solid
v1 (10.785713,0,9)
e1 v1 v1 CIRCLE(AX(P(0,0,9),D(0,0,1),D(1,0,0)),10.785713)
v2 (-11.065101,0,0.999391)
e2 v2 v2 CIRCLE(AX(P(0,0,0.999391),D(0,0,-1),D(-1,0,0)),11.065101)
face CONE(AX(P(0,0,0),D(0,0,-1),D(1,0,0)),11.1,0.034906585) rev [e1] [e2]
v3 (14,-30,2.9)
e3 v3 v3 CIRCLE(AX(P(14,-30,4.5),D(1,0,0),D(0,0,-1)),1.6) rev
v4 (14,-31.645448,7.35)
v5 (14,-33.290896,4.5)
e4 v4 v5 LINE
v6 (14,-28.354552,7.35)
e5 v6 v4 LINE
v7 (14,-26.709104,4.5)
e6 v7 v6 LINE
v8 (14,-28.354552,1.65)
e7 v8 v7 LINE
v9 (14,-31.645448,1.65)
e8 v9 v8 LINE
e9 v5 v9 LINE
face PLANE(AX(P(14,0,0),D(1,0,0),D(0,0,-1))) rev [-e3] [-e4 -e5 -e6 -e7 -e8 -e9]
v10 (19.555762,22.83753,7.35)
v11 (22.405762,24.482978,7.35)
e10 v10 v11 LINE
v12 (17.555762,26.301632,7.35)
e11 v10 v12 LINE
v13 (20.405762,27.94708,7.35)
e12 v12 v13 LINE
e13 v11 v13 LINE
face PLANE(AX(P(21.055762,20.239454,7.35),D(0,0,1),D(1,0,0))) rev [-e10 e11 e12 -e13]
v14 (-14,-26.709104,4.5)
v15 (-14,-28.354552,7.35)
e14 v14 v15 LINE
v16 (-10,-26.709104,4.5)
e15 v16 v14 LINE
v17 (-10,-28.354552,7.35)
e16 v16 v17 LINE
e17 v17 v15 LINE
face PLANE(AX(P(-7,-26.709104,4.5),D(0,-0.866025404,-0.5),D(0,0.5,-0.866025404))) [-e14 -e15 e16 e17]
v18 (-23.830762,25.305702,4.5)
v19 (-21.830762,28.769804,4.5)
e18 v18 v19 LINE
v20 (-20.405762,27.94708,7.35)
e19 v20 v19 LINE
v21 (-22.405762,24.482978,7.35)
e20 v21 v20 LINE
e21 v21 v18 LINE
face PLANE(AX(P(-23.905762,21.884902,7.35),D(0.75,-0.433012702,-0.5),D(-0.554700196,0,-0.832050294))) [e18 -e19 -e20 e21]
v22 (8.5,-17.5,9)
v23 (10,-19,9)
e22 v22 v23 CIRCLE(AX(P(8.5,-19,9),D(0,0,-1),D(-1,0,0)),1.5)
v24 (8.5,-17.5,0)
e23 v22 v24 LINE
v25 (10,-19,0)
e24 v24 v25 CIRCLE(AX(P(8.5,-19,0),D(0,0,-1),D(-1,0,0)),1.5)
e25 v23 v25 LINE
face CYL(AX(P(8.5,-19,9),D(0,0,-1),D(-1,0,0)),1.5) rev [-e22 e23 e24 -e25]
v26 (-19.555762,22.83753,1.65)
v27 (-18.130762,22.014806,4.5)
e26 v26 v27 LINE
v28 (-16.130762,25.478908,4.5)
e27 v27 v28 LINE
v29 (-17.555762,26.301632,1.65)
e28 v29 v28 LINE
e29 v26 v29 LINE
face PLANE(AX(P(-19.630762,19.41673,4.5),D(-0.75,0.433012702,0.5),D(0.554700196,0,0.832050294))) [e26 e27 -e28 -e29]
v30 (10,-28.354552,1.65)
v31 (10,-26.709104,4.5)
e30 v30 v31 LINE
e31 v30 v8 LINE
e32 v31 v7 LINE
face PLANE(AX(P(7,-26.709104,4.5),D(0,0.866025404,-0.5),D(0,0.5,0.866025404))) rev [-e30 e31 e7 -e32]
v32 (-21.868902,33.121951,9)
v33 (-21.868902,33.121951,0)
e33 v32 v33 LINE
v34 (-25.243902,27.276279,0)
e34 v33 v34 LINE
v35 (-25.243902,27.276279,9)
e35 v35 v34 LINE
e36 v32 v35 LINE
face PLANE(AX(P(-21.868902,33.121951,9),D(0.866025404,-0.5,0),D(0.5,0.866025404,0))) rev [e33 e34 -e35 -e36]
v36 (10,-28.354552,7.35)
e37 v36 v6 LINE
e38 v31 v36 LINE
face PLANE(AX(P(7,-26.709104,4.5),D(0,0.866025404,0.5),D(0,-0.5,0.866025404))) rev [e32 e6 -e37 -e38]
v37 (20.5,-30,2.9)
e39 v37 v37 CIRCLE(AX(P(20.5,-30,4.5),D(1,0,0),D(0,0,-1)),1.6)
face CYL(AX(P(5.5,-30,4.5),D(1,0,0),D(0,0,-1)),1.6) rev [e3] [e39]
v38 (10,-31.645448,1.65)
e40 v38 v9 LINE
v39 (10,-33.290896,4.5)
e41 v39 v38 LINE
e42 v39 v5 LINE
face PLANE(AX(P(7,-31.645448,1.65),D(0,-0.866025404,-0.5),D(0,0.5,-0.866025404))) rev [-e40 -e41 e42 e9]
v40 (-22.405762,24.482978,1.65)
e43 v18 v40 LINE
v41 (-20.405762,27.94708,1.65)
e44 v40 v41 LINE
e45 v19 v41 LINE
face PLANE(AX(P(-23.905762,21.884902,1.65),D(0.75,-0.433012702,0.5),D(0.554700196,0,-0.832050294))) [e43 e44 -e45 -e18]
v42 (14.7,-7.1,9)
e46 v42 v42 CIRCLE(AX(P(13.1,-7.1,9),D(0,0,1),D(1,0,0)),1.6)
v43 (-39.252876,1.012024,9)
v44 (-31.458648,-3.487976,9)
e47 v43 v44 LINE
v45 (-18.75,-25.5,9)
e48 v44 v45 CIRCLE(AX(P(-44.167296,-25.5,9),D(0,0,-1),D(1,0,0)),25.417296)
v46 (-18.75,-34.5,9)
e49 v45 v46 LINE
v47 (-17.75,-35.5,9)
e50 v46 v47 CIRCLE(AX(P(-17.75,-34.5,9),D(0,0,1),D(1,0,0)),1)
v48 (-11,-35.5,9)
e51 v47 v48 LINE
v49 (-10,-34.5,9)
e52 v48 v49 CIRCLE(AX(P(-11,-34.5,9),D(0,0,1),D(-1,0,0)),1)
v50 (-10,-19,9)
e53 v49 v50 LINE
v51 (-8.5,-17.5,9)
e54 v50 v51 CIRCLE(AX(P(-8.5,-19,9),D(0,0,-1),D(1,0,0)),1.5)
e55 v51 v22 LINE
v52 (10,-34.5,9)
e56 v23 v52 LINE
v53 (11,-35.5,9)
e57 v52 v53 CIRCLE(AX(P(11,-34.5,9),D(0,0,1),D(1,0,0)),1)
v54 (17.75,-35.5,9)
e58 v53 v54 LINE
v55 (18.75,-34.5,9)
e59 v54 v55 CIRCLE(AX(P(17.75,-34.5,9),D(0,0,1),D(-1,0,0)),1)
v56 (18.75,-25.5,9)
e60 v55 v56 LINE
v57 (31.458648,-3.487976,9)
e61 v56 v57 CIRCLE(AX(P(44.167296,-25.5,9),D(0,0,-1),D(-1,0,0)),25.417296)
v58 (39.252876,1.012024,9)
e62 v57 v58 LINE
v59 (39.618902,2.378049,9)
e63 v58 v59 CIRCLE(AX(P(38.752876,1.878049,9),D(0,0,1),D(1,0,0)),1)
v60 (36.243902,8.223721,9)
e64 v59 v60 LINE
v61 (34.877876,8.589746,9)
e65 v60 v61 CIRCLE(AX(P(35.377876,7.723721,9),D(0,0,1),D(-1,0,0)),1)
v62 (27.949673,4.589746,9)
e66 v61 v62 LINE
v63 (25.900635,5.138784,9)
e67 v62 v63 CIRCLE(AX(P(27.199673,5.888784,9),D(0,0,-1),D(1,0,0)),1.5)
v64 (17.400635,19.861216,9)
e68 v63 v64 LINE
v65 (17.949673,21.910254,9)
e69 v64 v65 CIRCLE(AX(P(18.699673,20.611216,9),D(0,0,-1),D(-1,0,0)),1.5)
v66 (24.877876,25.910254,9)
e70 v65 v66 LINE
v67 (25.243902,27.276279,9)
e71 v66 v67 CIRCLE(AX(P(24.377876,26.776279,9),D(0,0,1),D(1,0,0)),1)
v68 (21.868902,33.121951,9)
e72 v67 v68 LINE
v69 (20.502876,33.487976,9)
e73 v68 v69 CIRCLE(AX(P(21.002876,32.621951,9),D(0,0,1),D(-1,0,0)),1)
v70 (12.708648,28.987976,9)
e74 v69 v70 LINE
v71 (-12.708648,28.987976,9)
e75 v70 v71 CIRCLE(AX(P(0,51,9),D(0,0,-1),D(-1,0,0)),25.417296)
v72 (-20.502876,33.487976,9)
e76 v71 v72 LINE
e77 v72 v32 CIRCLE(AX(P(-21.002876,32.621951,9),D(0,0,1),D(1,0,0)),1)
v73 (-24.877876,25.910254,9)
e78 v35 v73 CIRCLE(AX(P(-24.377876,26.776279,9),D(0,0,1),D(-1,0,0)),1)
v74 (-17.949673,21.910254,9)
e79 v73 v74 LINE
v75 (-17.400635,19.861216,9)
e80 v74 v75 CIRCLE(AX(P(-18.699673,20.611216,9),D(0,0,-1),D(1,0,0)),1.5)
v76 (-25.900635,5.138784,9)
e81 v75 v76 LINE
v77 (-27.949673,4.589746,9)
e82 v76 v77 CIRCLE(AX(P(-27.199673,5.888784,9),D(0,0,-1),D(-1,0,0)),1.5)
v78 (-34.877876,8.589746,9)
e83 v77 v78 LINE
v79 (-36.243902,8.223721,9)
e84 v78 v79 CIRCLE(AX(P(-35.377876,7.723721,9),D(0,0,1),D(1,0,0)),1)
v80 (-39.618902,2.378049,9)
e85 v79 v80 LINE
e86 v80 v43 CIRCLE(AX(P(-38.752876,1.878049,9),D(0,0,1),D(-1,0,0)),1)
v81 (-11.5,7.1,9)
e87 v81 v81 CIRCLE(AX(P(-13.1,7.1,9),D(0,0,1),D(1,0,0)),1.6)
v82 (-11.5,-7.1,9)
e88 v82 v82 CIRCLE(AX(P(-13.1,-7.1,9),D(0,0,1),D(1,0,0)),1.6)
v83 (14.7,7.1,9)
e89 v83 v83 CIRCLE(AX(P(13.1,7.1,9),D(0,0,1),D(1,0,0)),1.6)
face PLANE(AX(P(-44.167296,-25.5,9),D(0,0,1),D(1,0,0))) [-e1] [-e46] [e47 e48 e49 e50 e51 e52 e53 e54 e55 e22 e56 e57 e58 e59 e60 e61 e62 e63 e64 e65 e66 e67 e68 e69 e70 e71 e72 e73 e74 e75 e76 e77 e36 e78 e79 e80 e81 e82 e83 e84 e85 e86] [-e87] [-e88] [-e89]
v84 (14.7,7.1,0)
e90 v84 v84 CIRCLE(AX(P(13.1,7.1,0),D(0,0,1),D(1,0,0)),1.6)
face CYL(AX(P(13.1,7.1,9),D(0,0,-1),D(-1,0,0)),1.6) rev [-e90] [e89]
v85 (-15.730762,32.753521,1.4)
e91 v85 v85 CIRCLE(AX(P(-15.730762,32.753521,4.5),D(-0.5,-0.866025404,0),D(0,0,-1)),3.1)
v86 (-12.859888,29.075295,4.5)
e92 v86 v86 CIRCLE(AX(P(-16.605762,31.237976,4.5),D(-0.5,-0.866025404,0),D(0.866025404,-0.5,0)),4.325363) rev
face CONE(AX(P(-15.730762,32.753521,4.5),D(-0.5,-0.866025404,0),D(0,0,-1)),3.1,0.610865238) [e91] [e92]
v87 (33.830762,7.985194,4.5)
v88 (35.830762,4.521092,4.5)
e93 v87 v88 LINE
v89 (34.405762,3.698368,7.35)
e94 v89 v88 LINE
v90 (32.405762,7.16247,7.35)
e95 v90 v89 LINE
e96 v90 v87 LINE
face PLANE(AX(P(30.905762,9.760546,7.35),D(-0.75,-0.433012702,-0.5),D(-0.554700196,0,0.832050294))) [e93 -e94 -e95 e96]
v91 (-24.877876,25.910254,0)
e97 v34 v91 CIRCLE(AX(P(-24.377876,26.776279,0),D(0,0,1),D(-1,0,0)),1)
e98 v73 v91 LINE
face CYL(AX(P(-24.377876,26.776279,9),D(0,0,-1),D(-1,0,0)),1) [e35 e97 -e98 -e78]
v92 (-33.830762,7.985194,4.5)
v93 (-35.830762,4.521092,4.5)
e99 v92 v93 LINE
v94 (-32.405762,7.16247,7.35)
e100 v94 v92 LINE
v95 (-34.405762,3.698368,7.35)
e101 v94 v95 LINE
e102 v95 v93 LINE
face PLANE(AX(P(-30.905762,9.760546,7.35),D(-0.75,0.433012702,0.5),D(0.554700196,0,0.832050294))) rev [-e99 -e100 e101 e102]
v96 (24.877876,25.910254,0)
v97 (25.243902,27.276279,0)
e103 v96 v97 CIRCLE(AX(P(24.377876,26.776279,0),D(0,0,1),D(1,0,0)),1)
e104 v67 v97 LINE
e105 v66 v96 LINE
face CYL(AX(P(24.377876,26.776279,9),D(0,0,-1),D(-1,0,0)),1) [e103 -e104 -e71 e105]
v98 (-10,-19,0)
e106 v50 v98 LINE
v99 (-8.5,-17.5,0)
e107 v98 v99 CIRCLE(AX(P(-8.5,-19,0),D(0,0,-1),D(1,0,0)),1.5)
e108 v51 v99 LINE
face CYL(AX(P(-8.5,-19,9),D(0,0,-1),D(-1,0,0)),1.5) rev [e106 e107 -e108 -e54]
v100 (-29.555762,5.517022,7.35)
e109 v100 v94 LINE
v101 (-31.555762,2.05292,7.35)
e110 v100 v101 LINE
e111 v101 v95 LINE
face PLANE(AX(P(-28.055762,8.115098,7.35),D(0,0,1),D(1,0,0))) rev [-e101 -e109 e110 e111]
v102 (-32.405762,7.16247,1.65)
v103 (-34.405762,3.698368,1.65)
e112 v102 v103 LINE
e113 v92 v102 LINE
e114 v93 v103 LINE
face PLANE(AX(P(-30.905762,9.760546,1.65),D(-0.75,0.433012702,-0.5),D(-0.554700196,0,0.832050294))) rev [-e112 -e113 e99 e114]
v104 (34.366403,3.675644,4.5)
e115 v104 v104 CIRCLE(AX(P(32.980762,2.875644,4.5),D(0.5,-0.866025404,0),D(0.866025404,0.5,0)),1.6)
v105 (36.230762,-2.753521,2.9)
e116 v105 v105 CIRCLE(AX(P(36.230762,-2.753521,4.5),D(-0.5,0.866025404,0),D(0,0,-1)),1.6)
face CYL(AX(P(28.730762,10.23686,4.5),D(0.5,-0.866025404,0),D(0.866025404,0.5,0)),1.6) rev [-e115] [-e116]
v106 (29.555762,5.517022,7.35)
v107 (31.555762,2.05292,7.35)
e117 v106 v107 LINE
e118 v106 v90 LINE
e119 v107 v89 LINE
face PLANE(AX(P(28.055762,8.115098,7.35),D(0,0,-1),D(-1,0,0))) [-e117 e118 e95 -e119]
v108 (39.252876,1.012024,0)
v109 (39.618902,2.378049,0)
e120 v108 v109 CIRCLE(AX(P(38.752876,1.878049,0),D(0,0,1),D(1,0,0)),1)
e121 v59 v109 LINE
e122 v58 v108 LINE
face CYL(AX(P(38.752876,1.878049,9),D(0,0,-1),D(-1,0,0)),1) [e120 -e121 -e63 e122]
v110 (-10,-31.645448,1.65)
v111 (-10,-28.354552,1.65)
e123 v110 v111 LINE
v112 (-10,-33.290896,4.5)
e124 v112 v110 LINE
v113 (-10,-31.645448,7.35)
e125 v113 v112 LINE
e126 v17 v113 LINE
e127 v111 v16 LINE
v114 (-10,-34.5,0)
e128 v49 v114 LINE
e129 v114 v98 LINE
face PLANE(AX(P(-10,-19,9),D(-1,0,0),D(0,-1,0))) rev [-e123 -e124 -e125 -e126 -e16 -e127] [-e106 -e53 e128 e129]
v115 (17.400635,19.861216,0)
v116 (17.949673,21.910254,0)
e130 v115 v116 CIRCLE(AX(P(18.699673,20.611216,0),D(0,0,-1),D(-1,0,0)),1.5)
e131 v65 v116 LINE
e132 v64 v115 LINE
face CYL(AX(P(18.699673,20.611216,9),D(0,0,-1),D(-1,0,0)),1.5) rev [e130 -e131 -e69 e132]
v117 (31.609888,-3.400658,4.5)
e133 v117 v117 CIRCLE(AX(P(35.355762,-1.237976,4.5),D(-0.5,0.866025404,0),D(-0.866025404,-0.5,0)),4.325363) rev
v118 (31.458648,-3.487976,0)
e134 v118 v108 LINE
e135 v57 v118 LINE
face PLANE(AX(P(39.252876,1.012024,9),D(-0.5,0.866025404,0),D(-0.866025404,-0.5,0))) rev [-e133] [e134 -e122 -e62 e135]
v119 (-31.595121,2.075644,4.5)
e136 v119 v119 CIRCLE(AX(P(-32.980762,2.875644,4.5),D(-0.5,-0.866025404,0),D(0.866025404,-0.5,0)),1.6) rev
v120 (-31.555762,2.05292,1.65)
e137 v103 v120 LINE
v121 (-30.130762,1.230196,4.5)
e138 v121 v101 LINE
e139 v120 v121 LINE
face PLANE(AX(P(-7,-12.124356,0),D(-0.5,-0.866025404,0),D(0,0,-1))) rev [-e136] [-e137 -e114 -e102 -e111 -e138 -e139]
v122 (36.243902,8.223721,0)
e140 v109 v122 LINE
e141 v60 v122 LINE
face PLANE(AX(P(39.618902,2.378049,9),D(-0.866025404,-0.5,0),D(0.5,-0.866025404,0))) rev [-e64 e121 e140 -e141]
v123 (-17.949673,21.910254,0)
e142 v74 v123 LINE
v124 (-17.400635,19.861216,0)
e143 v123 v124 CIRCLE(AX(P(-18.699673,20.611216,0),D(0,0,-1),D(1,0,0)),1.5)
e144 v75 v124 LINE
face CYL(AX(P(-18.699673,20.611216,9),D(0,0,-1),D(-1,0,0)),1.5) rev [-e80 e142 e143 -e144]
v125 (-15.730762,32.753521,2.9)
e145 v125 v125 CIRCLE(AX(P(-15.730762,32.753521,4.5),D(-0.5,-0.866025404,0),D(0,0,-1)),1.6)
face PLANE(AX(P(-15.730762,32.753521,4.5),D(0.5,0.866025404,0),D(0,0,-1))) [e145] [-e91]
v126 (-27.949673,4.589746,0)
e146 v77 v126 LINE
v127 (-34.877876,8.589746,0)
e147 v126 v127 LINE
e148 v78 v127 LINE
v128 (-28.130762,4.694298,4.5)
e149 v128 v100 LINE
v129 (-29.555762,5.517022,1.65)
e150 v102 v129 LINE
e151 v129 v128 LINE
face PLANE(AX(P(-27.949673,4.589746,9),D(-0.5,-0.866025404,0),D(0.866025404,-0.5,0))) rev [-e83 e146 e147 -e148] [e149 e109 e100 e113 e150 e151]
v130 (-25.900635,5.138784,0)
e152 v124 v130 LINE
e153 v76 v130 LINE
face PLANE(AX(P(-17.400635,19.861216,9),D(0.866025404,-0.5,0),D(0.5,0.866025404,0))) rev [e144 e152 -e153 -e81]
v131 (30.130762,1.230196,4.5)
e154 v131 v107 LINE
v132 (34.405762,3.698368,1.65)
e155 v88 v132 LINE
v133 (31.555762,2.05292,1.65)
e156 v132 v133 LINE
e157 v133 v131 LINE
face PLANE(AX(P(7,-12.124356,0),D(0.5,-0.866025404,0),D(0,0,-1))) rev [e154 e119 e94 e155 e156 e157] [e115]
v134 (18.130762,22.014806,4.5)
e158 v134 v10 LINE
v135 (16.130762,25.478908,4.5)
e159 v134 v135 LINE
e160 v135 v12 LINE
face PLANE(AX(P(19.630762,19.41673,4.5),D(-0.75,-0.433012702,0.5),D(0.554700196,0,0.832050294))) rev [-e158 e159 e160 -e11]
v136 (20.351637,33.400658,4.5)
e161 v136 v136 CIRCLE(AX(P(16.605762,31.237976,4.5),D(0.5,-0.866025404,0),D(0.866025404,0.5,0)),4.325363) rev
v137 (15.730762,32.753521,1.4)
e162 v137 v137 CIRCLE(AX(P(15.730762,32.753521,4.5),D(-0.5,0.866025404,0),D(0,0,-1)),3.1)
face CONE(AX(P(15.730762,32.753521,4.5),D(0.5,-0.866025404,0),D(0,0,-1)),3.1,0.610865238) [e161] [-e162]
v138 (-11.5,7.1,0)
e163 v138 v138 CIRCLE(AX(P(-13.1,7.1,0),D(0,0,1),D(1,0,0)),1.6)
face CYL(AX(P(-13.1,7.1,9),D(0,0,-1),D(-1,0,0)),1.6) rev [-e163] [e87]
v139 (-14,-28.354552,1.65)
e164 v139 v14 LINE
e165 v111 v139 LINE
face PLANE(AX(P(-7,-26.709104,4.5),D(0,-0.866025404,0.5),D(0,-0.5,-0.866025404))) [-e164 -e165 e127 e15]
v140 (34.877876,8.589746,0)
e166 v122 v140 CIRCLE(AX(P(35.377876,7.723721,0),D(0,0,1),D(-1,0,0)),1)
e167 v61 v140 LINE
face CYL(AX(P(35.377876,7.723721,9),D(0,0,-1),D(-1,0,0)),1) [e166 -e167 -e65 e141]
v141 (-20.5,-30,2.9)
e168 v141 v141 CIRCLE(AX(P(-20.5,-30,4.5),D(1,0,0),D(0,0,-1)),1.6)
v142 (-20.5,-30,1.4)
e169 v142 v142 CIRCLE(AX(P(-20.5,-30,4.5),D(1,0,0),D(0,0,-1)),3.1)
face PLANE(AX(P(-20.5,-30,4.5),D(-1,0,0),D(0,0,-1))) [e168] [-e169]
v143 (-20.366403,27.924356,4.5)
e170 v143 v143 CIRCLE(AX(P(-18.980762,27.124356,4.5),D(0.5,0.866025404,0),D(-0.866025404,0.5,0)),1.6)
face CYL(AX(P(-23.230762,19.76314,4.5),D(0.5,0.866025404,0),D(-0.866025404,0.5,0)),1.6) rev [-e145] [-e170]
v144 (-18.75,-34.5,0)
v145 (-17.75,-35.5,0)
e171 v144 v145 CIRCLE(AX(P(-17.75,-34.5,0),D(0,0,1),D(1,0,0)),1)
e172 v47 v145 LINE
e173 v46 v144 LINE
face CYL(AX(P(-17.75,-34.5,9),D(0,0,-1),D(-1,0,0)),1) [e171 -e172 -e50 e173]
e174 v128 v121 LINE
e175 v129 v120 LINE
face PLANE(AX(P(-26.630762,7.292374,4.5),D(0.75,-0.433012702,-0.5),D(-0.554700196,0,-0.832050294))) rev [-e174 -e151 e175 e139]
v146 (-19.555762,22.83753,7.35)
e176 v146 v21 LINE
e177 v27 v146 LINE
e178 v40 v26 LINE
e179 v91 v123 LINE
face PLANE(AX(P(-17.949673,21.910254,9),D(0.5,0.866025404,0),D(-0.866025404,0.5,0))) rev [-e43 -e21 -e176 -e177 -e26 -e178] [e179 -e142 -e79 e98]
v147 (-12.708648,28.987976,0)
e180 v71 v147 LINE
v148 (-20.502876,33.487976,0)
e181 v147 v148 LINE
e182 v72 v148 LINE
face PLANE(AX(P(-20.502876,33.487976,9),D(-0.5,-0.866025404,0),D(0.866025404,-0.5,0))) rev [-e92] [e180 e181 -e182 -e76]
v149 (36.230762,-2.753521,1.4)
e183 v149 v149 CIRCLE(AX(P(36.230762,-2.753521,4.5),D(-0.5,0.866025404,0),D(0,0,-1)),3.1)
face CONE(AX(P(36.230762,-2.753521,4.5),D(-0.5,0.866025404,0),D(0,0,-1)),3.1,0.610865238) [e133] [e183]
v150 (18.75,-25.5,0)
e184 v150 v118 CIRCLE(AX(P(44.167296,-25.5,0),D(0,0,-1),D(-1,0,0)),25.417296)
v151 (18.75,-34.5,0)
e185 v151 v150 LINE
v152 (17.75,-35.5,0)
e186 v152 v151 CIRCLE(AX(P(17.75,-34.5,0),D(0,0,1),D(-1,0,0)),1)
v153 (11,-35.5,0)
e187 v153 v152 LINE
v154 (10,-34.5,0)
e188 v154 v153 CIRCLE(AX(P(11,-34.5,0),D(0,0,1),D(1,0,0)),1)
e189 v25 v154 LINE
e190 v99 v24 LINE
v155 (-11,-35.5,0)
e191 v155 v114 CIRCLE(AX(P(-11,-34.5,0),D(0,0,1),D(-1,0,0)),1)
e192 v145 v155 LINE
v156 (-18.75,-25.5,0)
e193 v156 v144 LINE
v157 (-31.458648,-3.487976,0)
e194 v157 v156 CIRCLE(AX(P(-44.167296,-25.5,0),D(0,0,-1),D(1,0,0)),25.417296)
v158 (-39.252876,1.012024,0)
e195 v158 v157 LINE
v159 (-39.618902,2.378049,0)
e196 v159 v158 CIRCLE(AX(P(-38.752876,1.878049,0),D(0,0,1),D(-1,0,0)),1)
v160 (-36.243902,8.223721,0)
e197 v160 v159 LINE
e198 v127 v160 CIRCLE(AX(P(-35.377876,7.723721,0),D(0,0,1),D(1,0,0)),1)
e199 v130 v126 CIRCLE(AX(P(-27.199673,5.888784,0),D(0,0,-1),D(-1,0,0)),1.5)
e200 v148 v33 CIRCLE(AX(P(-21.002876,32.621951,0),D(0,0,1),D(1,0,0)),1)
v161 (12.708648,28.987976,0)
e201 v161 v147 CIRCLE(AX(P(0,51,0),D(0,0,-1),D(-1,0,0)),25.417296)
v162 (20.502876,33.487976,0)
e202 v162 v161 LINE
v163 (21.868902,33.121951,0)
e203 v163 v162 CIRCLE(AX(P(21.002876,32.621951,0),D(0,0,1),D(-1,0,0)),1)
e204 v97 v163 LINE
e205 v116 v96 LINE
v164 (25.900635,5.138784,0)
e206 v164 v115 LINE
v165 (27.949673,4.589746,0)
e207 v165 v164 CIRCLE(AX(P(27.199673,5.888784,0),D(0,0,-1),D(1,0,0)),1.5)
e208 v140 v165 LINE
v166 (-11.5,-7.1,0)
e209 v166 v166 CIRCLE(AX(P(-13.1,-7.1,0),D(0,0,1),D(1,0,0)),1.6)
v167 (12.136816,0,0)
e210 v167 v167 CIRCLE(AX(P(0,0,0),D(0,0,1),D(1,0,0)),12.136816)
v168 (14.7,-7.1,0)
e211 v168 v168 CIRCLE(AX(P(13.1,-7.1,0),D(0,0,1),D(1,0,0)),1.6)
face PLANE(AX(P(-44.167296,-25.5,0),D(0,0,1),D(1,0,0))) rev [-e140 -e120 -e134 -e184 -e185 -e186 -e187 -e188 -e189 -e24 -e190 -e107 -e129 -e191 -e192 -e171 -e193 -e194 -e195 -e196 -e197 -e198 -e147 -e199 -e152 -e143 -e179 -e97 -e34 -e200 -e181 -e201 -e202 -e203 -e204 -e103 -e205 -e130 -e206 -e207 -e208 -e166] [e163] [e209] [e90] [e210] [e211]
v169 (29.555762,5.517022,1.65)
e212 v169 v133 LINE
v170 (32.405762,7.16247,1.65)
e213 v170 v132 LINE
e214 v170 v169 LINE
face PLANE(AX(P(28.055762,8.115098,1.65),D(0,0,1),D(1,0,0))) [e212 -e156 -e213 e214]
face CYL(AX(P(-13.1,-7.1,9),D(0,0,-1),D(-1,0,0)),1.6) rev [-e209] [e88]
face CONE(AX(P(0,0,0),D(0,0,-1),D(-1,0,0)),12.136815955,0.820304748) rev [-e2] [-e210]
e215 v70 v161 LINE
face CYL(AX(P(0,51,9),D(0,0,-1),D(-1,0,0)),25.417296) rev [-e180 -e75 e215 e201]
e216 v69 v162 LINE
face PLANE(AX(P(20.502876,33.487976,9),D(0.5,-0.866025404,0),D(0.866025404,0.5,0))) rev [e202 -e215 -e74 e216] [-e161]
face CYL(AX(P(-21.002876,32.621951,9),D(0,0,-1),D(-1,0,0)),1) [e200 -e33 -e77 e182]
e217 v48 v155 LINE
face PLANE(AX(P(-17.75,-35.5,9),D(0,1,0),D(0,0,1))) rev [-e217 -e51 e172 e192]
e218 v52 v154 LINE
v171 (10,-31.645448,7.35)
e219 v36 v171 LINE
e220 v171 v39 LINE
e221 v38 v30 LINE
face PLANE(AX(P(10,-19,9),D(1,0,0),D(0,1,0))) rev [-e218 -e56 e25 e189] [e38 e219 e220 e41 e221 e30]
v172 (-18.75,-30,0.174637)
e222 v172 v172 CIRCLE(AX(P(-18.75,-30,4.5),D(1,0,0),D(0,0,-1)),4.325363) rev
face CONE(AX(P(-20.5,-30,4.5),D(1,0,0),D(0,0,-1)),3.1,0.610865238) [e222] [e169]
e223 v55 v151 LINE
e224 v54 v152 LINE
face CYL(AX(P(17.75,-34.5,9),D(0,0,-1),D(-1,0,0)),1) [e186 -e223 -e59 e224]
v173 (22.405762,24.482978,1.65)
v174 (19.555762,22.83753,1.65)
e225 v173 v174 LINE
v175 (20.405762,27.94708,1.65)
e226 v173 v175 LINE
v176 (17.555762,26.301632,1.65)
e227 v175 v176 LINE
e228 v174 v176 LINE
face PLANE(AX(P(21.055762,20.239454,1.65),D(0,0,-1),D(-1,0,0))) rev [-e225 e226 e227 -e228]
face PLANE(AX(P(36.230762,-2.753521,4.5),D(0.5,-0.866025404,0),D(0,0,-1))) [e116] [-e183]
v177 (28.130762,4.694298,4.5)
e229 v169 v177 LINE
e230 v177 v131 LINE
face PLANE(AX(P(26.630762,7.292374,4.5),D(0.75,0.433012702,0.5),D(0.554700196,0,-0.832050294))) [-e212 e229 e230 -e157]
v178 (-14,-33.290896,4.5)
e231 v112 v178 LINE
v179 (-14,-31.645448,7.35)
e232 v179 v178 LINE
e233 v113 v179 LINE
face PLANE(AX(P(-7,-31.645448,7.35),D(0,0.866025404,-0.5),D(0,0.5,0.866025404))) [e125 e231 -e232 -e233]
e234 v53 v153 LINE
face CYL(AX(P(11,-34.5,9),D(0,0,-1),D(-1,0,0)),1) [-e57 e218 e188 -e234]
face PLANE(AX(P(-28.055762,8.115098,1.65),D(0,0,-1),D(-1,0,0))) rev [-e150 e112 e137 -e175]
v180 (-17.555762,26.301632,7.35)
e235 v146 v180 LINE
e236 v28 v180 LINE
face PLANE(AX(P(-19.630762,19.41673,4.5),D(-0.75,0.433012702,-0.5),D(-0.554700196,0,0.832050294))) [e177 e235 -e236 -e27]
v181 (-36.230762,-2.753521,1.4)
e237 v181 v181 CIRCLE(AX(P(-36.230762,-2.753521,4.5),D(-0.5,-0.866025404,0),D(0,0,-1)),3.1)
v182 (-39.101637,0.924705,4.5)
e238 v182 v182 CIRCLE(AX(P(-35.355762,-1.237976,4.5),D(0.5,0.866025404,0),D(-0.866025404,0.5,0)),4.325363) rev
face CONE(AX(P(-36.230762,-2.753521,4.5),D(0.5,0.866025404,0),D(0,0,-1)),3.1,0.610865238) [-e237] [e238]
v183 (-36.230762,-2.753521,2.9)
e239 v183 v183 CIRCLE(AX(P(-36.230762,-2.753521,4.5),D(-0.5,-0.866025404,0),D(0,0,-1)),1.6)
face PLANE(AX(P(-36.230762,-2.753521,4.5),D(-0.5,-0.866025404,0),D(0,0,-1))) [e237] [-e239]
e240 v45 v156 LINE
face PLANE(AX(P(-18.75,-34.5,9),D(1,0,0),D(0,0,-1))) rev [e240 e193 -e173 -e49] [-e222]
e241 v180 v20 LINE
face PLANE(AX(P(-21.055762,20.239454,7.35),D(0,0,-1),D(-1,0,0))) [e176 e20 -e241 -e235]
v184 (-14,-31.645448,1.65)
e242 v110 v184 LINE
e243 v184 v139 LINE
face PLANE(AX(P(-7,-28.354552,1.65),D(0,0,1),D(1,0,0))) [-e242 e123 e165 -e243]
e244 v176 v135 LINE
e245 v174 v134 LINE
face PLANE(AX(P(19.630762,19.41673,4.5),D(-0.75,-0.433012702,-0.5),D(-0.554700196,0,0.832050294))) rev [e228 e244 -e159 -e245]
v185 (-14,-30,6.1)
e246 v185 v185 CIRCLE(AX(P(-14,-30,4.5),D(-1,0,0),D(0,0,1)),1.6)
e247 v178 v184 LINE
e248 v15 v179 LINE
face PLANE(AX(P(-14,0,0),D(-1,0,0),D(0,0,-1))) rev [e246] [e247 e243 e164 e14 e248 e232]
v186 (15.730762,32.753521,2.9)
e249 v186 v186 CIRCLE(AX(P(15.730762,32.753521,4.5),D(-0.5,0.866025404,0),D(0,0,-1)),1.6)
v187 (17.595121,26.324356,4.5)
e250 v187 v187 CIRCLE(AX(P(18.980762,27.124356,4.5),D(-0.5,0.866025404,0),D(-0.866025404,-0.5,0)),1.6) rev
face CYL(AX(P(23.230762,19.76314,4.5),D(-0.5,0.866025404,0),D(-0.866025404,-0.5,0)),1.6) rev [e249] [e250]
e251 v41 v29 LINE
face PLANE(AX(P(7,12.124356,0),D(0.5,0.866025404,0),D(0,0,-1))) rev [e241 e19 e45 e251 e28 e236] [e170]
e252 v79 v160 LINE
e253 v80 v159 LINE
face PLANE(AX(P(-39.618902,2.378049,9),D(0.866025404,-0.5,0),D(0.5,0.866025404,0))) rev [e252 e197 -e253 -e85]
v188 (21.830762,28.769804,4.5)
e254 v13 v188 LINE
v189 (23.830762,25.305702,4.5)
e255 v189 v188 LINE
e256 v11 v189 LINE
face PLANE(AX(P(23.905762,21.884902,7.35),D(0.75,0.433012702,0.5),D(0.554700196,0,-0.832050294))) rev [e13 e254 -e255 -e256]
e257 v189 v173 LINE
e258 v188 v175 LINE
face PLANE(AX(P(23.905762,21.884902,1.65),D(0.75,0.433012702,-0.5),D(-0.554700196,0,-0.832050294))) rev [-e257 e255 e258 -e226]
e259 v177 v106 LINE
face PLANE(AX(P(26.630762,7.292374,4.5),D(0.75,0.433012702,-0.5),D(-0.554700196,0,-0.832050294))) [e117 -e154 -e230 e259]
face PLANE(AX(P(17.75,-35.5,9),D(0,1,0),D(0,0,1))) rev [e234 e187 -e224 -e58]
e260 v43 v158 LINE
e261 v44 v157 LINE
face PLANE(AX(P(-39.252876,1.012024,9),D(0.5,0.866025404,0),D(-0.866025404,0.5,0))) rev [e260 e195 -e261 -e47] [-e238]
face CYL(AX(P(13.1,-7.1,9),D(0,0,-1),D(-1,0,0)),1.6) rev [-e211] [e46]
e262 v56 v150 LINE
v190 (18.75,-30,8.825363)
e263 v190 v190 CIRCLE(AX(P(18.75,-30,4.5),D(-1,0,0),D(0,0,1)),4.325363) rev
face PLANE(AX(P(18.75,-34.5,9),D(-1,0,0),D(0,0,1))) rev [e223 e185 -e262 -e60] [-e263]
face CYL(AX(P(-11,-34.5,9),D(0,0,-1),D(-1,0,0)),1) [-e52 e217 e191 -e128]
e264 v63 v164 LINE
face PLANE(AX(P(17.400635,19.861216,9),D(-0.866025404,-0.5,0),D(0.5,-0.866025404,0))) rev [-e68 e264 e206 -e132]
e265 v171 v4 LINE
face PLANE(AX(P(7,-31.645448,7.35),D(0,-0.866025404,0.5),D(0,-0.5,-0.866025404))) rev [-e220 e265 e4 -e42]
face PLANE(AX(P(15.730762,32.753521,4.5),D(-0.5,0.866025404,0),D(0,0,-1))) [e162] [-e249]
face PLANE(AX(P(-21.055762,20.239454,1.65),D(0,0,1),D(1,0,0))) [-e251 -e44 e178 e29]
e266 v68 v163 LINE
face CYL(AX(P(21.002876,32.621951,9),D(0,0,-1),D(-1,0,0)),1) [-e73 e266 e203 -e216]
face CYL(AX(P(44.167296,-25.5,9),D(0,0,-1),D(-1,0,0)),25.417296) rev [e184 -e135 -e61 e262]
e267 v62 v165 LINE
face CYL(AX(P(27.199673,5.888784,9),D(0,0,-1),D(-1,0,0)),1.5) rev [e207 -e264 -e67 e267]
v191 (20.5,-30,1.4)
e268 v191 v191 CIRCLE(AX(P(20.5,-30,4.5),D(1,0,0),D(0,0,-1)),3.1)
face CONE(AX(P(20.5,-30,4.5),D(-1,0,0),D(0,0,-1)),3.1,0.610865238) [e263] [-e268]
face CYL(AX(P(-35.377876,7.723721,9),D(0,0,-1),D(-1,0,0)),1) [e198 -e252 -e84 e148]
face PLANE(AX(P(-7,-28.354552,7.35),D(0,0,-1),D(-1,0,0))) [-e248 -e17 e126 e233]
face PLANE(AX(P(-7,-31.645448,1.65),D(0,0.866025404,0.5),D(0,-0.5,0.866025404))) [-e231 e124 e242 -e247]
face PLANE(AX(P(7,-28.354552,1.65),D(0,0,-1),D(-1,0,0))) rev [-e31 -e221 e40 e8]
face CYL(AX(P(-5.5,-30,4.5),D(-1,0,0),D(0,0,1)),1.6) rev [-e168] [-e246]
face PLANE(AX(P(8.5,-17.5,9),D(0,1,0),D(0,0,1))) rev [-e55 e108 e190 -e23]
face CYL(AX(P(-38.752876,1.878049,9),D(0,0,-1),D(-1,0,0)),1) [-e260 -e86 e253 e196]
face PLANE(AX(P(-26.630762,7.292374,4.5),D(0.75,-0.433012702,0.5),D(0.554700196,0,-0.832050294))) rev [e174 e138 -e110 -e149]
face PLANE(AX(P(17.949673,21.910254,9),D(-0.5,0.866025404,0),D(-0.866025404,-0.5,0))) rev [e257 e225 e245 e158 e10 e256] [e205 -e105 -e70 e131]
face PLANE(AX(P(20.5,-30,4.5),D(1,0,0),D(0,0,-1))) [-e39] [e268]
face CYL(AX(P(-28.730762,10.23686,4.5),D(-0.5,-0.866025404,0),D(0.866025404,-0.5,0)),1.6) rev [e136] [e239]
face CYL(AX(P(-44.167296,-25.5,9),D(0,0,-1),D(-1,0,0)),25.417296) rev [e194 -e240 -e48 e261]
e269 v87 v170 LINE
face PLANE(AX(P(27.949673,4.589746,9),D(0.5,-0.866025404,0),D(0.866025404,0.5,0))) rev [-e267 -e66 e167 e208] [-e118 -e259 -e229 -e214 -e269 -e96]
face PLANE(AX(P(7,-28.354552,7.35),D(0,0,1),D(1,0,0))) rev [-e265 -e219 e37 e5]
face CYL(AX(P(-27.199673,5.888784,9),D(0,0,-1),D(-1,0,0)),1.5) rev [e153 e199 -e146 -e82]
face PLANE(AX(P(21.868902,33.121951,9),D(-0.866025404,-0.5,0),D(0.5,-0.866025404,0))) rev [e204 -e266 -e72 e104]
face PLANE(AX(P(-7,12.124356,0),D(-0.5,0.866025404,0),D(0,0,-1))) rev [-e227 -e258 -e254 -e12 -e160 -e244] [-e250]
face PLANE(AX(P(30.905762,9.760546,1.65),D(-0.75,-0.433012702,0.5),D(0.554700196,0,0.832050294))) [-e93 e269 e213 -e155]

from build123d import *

# Parameters (mm, degrees)
BOSS_EXTRUDE1_DEPTH     = 9
SKETCH4_R               = 3.1
BOSS_EXTRUDE3_DEPTH     = 1.75
BOSS_EXTRUDE3_DRAFT     = 35
SKETCH7_R               = 1.600000259
CUT_EXTRUDE4_DEPTH      = 15
CUT_EXTRUDE5_DEPTH      = 7
MIRROR1_START           = -14
MIRROR1_DEPTH           = 4
MIRROR1_START_2         = -18.75
MIRROR1_2_OUTLINE_R     = 1.600000259
MIRROR1_2_DEPTH         = 4.75
CIRPATTERN1_START       = -14
CIRPATTERN1_DEPTH       = 28
CIRPATTERN1_START_2     = -18.75
CIRPATTERN1_2_OUTLINE_R = 1.600000259
CIRPATTERN1_2_DEPTH     = 37.5
CIRPATTERN1_START_3     = -20.405762011
CIRPATTERN1_3_OUTLINE_R = 1.600000259
CIRPATTERN1_3_DEPTH     = 1.655762011
CIRPATTERN1_4_DEPTH     = 28
CIRPATTERN1_5_OUTLINE_R = 1.600000259
CIRPATTERN1_5_DEPTH     = 37.5
CIRPATTERN1_START_4     = 18.75
CIRPATTERN1_6_OUTLINE_R = 1.600000259
CIRPATTERN1_6_DEPTH     = 1.616403084
SKETCH8_R               = 11.1
CUT_EXTRUDE6_DEPTH      = 55.051282913
CUT_EXTRUDE6_TAPER      = 2
SKETCH9_R               = 1.6
CUT_EXTRUDE8_DEPTH      = 55.051282913
CHAMFER1_SIZE           = 1.036815955
CHAMFER1_SIZE_2         = 1


with BuildPart() as part:
    # Sketch3 → Boss-Extrude1 (new body)
    with BuildSketch(Plane.XY):
        with BuildLine():
            Line((-18.75, -34.5), (-18.75, -25.5))
            ThreePointArc((-18.75, -25.5), (-22.155271914, -12.791352203), (-31.458647797, -3.487976321))
            Line((-31.458647797, -3.487976321), (-39.252876431, 1.012023679))
            ThreePointArc((-39.252876431, 1.012023679), (-39.718802257, 1.619230038), (-39.618901834, 2.378049083))
            Line((-39.618901834, 2.378049083), (-36.243901834, 8.223720558))
            ThreePointArc((-36.243901834, 8.223720558), (-35.636695476, 8.689646385), (-34.877876431, 8.589745962))
            Line((-34.877876431, 8.589745962), (-27.9496732, 4.589745962))
            ThreePointArc((-27.9496732, 4.589745962), (-26.811444633, 4.439895328), (-25.900635095, 5.138784068))
            Line((-25.900635095, 5.138784068), (-17.400635095, 19.861215932))
            ThreePointArc((-17.400635095, 19.861215932), (-17.250784461, 20.9994445), (-17.9496732, 21.910254038))
            Line((-17.9496732, 21.910254038), (-24.877876431, 25.910254038))
            ThreePointArc((-24.877876431, 25.910254038), (-25.343802257, 26.517460397), (-25.243901834, 27.276279442))
            Line((-25.243901834, 27.276279442), (-21.868901834, 33.121950917))
            ThreePointArc((-21.868901834, 33.121950917), (-21.261695476, 33.587876743), (-20.502876431, 33.487976321))
            Line((-20.502876431, 33.487976321), (-12.708647797, 28.987976321))
            ThreePointArc((-12.708647797, 28.987976321), (0, 25.582704407), (12.708647797, 28.987976321))
            Line((12.708647797, 28.987976321), (20.502876431, 33.487976321))
            ThreePointArc((20.502876431, 33.487976321), (21.261695476, 33.587876743), (21.868901834, 33.121950917))
            Line((21.868901834, 33.121950917), (25.243901834, 27.276279442))
            ThreePointArc((25.243901834, 27.276279442), (25.343802257, 26.517460397), (24.877876431, 25.910254038))
            Line((24.877876431, 25.910254038), (17.9496732, 21.910254038))
            ThreePointArc((17.9496732, 21.910254038), (17.250784461, 20.9994445), (17.400635095, 19.861215932))
            Line((17.400635095, 19.861215932), (25.900635095, 5.138784068))
            ThreePointArc((25.900635095, 5.138784068), (26.811444633, 4.439895328), (27.9496732, 4.589745962))
            Line((27.9496732, 4.589745962), (34.877876431, 8.589745962))
            ThreePointArc((34.877876431, 8.589745962), (35.636695476, 8.689646385), (36.243901834, 8.223720558))
            Line((36.243901834, 8.223720558), (39.618901834, 2.378049083))
            ThreePointArc((39.618901834, 2.378049083), (39.718802257, 1.619230038), (39.252876431, 1.012023679))
            Line((39.252876431, 1.012023679), (31.458647797, -3.487976321))
            ThreePointArc((31.458647797, -3.487976321), (22.155271914, -12.791352203), (18.75, -25.5))
            Line((18.75, -25.5), (18.75, -34.5))
            ThreePointArc((18.75, -34.5), (18.457106781, -35.207106781), (17.75, -35.5))
            Line((17.75, -35.5), (11, -35.5))
            ThreePointArc((11, -35.5), (10.292893219, -35.207106781), (10, -34.5))
            Line((10, -34.5), (10, -19))
            ThreePointArc((10, -19), (9.560660172, -17.939339828), (8.5, -17.5))
            Line((8.5, -17.5), (-8.5, -17.5))
            ThreePointArc((-8.5, -17.5), (-9.560660172, -17.939339828), (-10, -19))
            Line((-10, -19), (-10, -34.5))
            ThreePointArc((-10, -34.5), (-10.292893219, -35.207106781), (-11, -35.5))
            Line((-11, -35.5), (-17.75, -35.5))
            ThreePointArc((-17.75, -35.5), (-18.457106781, -35.207106781), (-18.75, -34.5))
        make_face()
    extrude(amount=BOSS_EXTRUDE1_DEPTH)


with BuildPart() as boss_extrude3_tool:
    # Sketch4 → Boss-Extrude3 (with draft: the straight prism first)
    with BuildSketch(Plane(origin=(20.5, 0, 0), x_dir=(0, 0, -1), z_dir=(1, 0, 0))):
        with Locations((-4.5, -30)):
            Circle(SKETCH4_R)
    extrude(amount=-BOSS_EXTRUDE3_DEPTH)
    # Boss-Extrude3: the draft: its side faces are tilted about the plane it starts from
    boss_extrude3_sides = [boss_extrude3_tool.faces().sort_by_distance(p)[0] for p in [
        (19.625, -30, 7.6),
    ]]
    draft(boss_extrude3_sides, Plane(origin=(20.5, 0, 0), x_dir=(0, 0, -1), z_dir=(1, 0, 0)), BOSS_EXTRUDE3_DRAFT)


with BuildPart() as part_1:
    add(part.part)

    # Boss-Extrude3: add boss_extrude3_tool
    add(boss_extrude3_tool.part)

    # Sketch7 → Cut-Extrude4 (cut)
    with BuildSketch(Plane(origin=(20.5, 0, 0), x_dir=(0, 0, -1), z_dir=(1, 0, 0))):
        with Locations((-4.5, -30)):
            Circle(SKETCH7_R)
    extrude(amount=-CUT_EXTRUDE4_DEPTH, mode=Mode.SUBTRACT)

    # Sketch5 → Cut-Extrude5 (cut)
    with BuildSketch(Plane(origin=(14, 0, 0), x_dir=(0, 0, -1), z_dir=(1, 0, 0))):
        Polygon((-7.349999794, -28.354551852), (-7.349999794, -31.645448148), (-4.5, -33.290896297), (-1.650000206, -31.645448148), (-1.650000206, -28.354551852), (-4.5, -26.709103703), align=None)
    extrude(amount=-CUT_EXTRUDE5_DEPTH, mode=Mode.SUBTRACT)

    # Mirror1: read off the stored shape, not the designer's step
    # Mirror1 outline → Mirror1 (cut)
    with BuildSketch(Plane.YZ.offset(MIRROR1_START)):
        Polygon((-26.709103703, 4.5), (-28.354551852, 7.349999794), (-31.645448148, 7.349999794), (-33.290896297, 4.5), (-31.645448148, 1.650000206), (-28.354551852, 1.650000206), align=None)
    extrude(amount=MIRROR1_DEPTH, mode=Mode.SUBTRACT)

    # Mirror1 2 outline → Mirror1 2 (cut)
    with BuildSketch(Plane.YZ.offset(MIRROR1_START_2)):
        with Locations((-30, 4.5)):
            Circle(MIRROR1_2_OUTLINE_R)
    extrude(amount=MIRROR1_2_DEPTH, mode=Mode.SUBTRACT)

    # Mirror1 3 outline → Mirror1 3 (revolve)
    with BuildSketch(Plane(origin=(0, -30, 4.5), x_dir=(0, 1, 0), z_dir=(0, 0, -1))):
        Polygon((1.600000259, -18.75), (1.600000259, -20.5), (3.1, -20.5), (4.325363192, -18.75), align=None)
    revolve(axis=Axis((0, -30, 4.5), (1, 0, 0)))

    # CirPattern1: read off the stored shape, not the designer's step
    # CirPattern1 outline → CirPattern1 (cut)
    with BuildSketch(Plane(origin=(0, 0, 0), x_dir=(0.8660254037844362, 0.5000000000000042, 0), z_dir=(0.5000000000000042, -0.8660254037844363, 0)).offset(CIRPATTERN1_START)):
        Polygon((26.709103703, 4.5), (28.354551852, 1.650000206), (31.645448148, 1.650000206), (33.290896297, 4.5), (31.645448148, 7.349999794), (28.354551852, 7.349999794), align=None)
    extrude(amount=CIRPATTERN1_DEPTH, mode=Mode.SUBTRACT)

    # CirPattern1 2 outline → CirPattern1 2 (cut)
    with BuildSketch(Plane(origin=(0, 0, 0), x_dir=(0.8660254037844362, 0.5000000000000042, 0), z_dir=(0.5000000000000042, -0.8660254037844363, 0)).offset(CIRPATTERN1_START_2)):
        with Locations((30, 4.5)):
            Circle(CIRPATTERN1_2_OUTLINE_R)
    extrude(amount=CIRPATTERN1_2_DEPTH, mode=Mode.SUBTRACT)

    # CirPattern1 3 outline → CirPattern1 3 (add)
    with BuildSketch(Plane(origin=(0, 0, 0), x_dir=(0.8660254037844362, 0.5000000000000042, 0), z_dir=(0.5000000000000042, -0.8660254037844363, 0)).offset(CIRPATTERN1_START_3)):
        Polygon((26.709103703, 4.5), (28.354551852, 1.650000206), (31.645448148, 1.650000206), (33.290896297, 4.5), (31.645448148, 7.349999794), (28.354551852, 7.349999794), align=None)
        with Locations((30, 4.5)):
            Circle(CIRPATTERN1_3_OUTLINE_R, mode=Mode.SUBTRACT)
    extrude(amount=CIRPATTERN1_3_DEPTH)

    # CirPattern1 4 outline → CirPattern1 4 (cut)
    with BuildSketch(Plane(origin=(0, 0, 0), x_dir=(0.8660254037844431, -0.4999999999999921, 0), z_dir=(0.4999999999999921, 0.8660254037844433, 0)).offset(CIRPATTERN1_START)):
        Polygon((-26.709103703, -4.5), (-28.354551852, -1.650000206), (-31.645448148, -1.650000206), (-33.290896297, -4.5), (-31.645448148, -7.349999794), (-28.354551852, -7.349999794), align=None)
    extrude(amount=CIRPATTERN1_4_DEPTH, mode=Mode.SUBTRACT)

    # CirPattern1 5 outline → CirPattern1 5 (cut)
    with BuildSketch(Plane(origin=(0, 0, 0), x_dir=(0.8660254037844431, -0.4999999999999921, 0), z_dir=(0.4999999999999921, 0.8660254037844433, 0)).offset(CIRPATTERN1_START_2)):
        with Locations((-30, -4.5)):
            Circle(CIRPATTERN1_5_OUTLINE_R)
    extrude(amount=CIRPATTERN1_5_DEPTH, mode=Mode.SUBTRACT)

    # CirPattern1 6 outline → CirPattern1 6 (add)
    with BuildSketch(Plane(origin=(0, 0, 0), x_dir=(0.8660254037844431, -0.4999999999999921, 0), z_dir=(0.4999999999999921, 0.8660254037844433, 0)).offset(CIRPATTERN1_START_4)):
        Polygon((-26.709103703, -4.5), (-28.354551852, -1.650000206), (-31.645448148, -1.650000206), (-33.290896297, -4.5), (-31.645448148, -7.349999794), (-28.354551852, -7.349999794), align=None)
        with Locations((-30, -4.5)):
            Circle(CIRPATTERN1_6_OUTLINE_R, mode=Mode.SUBTRACT)
    extrude(amount=CIRPATTERN1_6_DEPTH)

    # CirPattern1 7 outline → CirPattern1 7 (revolve)
    with BuildSketch(Plane(origin=(-25.980762114, 15, 4.5), x_dir=(0.8660254037844431, -0.4999999999999921, 0), z_dir=(0, 0, 1))):
        Polygon((3.1, 20.5), (1.600000259, 20.5), (1.600000259, 18.75), (4.325363192, 18.75), align=None)
        Polygon((1.600000259, -18.75), (1.600000259, -20.5), (3.1, -20.5), (4.325363192, -18.75), align=None)
    revolve(axis=Axis((-25.980762114, 15, 4.5), (0.4999999999999921, 0.8660254037844431, 0)))

    # CirPattern1 8 outline → CirPattern1 8 (revolve)
    with BuildSketch(Plane(origin=(25.980762114, 15, 4.5), x_dir=(0.8660254037844362, 0.5000000000000042, 0), z_dir=(0, 0, -1))):
        Polygon((3.1, 20.5), (1.600000259, 20.5), (1.600000259, 18.75), (4.325363192, 18.75), align=None)
        Polygon((1.600000259, -18.75), (1.600000259, -20.5), (3.1, -20.5), (4.325363192, -18.75), align=None)
    revolve(axis=Axis((25.980762114, 15, 4.5), (0.5000000000000042, -0.8660254037844362, 0)))

    # CirPattern1 9 outline → CirPattern1 9 (revolve, cut)
    with BuildSketch(Plane(origin=(-25.980762114, 15, 4.5), x_dir=(0.8660254037844431, -0.4999999999999921, 0), z_dir=(0, 0, 1))):
        Polygon((3.290896297, 20.366403084), (3.193545568, 20.366403084), (3.290896297, 20.227371834), align=None)
    revolve(axis=Axis((-25.980762114, 15, 4.5), (0.4999999999999921, 0.8660254037844431, 0)), mode=Mode.SUBTRACT)

    # CirPattern1 10 outline → CirPattern1 10 (revolve, cut)
    with BuildSketch(Plane(origin=(25.980762114, 15, 4.5), x_dir=(0.8660254037844362, 0.5000000000000042, 0), z_dir=(0, 0, -1))):
        Polygon((3.290896297, -20.227371834), (3.16598615, -20.405762011), (3.290896297, -20.405762011), align=None)
    revolve(axis=Axis((25.980762114, 15, 4.5), (0.5000000000000042, -0.8660254037844362, 0)), mode=Mode.SUBTRACT)

    # Sketch8 → Cut-Extrude6 (cut, through all)
    with BuildSketch(Plane.XY):
        Circle(SKETCH8_R)
    extrude(amount=CUT_EXTRUDE6_DEPTH, taper=CUT_EXTRUDE6_TAPER, mode=Mode.SUBTRACT)

    # Sketch9 → Cut-Extrude8 (cut, through all)
    with BuildSketch(Plane.XY):
        with Locations((13.1, -7.1)):
            Circle(SKETCH9_R)
        with Locations((13.1, 7.1)):
            Circle(SKETCH9_R)
        with Locations((-13.1, 7.1)):
            Circle(SKETCH9_R)
        with Locations((-13.1, -7.1)):
            Circle(SKETCH9_R)
    extrude(amount=CUT_EXTRUDE8_DEPTH, mode=Mode.SUBTRACT)

    # Chamfer1
    # the kernel refuses this chamfer: 1.036815955, 1 mm, written as the material it takes off along each edge
    with BuildSketch(Plane(origin=(0, 0, 0), x_dir=(1, 0, 0), z_dir=(0, 1, 0))) as chamfer1_piece_1:
        Polygon((11.1 + CHAMFER1_SIZE, 0), (11.1 - CHAMFER1_SIZE_2 * 0.0348994967025, -CHAMFER1_SIZE_2 * 0.999390827019), (11.1, 0), align=None)
    revolve(axis=Axis((0, 0, 0), (0, 0, -1)), mode=Mode.SUBTRACT)


solid = part_1.part
